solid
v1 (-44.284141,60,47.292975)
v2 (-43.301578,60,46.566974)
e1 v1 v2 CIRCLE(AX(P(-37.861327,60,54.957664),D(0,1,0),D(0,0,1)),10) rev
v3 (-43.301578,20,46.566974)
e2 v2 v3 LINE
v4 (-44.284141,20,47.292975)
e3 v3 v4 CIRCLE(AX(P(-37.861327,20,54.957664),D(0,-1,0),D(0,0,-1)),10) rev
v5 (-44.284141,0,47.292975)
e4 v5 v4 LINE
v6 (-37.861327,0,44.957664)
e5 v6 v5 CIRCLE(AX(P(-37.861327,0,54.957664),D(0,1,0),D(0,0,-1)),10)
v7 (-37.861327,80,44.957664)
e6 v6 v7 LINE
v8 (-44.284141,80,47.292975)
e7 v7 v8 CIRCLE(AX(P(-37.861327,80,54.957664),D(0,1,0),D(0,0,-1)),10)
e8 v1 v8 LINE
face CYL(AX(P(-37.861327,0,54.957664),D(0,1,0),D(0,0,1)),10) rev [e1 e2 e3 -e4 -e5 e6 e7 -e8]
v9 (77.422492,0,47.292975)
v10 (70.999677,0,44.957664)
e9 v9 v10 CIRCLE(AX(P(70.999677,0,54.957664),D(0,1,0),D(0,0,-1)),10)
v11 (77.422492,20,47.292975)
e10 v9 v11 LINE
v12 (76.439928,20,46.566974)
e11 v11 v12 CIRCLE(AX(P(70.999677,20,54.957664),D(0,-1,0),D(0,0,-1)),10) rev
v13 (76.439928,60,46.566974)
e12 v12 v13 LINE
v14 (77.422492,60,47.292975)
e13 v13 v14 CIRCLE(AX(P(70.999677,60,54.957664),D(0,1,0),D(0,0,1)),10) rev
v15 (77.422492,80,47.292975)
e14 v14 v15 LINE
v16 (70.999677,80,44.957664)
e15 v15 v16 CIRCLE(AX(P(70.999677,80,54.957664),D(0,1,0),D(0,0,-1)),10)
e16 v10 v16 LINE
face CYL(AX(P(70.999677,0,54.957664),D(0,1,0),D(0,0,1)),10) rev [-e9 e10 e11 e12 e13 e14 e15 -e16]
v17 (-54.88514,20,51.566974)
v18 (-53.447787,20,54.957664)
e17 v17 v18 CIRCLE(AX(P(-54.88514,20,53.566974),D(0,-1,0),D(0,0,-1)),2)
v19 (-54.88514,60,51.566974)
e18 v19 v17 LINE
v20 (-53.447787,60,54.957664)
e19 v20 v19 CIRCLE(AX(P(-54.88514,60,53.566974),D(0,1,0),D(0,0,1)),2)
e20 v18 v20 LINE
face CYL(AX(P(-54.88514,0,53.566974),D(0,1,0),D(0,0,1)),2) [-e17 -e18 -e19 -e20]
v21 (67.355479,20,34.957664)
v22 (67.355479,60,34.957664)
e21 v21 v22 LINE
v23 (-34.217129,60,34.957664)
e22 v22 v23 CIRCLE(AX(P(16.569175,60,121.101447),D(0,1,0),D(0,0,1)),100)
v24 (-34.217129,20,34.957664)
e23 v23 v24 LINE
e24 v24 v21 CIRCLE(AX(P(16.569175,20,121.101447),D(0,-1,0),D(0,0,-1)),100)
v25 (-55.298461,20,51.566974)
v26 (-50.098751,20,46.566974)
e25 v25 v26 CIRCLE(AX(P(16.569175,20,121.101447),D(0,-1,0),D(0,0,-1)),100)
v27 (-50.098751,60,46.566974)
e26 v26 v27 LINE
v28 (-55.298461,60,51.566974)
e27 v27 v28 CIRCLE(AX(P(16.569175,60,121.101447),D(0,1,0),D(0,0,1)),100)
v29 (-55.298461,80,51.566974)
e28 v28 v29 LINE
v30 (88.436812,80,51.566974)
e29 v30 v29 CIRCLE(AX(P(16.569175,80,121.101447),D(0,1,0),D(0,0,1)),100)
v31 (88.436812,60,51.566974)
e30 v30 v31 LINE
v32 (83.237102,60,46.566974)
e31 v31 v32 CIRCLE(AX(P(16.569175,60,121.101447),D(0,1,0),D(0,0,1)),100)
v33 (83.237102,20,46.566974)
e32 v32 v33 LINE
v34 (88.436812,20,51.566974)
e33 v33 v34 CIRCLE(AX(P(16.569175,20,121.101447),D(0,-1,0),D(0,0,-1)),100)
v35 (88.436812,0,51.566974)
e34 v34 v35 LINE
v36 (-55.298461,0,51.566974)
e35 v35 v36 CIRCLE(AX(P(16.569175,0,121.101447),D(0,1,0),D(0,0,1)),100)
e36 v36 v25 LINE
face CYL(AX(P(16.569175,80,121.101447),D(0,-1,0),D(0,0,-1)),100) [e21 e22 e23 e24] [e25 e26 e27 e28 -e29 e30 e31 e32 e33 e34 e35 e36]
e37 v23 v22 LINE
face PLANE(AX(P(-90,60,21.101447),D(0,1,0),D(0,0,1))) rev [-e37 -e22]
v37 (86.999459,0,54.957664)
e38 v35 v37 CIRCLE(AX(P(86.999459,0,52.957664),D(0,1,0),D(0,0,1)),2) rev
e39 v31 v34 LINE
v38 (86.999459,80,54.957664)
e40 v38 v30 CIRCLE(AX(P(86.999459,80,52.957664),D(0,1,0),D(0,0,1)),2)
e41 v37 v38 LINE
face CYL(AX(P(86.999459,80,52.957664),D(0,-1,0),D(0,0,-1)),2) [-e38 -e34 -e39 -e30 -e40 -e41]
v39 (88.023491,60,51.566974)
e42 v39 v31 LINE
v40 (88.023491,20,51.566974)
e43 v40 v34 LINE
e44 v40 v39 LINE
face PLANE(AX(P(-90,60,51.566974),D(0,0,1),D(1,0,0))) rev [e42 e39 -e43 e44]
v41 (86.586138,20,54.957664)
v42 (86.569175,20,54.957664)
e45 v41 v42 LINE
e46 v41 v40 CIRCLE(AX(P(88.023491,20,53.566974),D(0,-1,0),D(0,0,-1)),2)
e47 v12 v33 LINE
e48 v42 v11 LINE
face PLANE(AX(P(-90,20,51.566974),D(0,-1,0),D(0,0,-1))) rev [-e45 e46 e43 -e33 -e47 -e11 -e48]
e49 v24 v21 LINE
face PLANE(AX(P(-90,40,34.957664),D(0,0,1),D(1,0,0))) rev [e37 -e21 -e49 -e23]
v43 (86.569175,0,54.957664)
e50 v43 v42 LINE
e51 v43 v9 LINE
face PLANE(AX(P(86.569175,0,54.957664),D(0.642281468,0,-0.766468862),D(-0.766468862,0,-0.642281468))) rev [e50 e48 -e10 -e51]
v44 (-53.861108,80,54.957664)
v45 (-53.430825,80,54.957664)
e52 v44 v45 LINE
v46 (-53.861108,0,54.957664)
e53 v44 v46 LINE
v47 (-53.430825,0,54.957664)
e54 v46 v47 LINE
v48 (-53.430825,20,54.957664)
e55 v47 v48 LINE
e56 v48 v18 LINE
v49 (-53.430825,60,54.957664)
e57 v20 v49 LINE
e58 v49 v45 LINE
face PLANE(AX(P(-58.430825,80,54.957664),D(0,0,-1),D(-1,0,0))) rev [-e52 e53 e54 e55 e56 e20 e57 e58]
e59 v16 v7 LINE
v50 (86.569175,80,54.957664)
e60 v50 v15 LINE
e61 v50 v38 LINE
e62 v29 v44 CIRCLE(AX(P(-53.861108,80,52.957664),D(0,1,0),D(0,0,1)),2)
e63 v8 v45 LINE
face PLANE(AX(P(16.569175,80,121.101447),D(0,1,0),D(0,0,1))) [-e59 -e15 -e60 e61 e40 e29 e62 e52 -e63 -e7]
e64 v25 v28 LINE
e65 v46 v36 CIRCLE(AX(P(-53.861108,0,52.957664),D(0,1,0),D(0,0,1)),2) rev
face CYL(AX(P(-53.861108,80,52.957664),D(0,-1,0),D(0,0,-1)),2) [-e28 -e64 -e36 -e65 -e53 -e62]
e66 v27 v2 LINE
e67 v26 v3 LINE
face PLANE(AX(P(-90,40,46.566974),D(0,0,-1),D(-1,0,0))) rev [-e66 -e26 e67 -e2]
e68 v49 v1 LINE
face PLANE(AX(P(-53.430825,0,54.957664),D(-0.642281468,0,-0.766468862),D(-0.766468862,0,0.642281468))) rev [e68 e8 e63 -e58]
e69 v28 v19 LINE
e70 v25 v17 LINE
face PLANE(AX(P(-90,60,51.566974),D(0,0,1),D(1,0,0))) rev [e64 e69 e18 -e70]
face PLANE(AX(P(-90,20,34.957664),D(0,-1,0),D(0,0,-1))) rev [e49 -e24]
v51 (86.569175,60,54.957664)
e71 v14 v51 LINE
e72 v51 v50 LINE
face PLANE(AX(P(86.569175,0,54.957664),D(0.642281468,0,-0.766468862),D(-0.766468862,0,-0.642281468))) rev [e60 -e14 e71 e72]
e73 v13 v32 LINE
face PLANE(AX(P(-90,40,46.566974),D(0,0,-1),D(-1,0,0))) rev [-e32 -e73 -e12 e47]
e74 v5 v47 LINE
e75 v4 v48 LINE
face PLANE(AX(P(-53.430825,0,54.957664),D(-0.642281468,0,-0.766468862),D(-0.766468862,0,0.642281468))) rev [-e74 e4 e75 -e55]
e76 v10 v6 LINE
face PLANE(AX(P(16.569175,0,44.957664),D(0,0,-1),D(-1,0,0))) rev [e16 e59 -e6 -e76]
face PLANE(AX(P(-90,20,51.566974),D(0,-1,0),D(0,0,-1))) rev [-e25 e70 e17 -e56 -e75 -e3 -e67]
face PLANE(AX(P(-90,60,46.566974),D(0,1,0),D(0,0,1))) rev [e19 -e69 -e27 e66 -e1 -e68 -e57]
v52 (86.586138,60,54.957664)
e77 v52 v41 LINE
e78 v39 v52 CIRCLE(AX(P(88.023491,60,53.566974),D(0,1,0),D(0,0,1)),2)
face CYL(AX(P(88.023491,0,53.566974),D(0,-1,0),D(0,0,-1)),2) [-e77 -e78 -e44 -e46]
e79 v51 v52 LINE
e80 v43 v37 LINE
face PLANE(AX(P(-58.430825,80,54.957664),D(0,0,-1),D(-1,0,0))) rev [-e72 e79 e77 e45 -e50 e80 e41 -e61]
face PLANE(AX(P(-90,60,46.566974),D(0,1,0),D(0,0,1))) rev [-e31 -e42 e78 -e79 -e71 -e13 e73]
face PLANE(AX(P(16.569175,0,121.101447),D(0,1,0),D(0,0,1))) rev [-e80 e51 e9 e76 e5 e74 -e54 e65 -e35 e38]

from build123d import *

# Parameters (mm, degrees)
EXTRUDE_4_DEPTH     = 80
CUT_EXTRUDE_1_DEPTH = 80
FILLET_3_R          = 2
FILLET_4_R          = 2
CUT_EXTRUDE_2_DEPTH = 90
CUT_EXTRUDE_3_DEPTH = 90
FILLET_5_R          = 2
FILLET_6_R          = 2


with BuildPart() as part:
    # 草图1 → 凸台-拉伸4 (new body)
    with BuildSketch(Plane(origin=(0, 0, 0), x_dir=(1, 0, 0), z_dir=(0, 1, 0))):
        with BuildLine():
            Line((-58.430824656, -54.95766375), (91.569175344, -54.95766375))
            ThreePointArc((91.569175344, -54.95766375), (16.569175344, -21.101446527), (-58.430824656, -54.95766375))
        make_face()
    extrude(amount=EXTRUDE_4_DEPTH)

    # 草图6 → 切除-拉伸1 (cut)
    with BuildSketch(Plane(origin=(0, 80, 0), x_dir=(1, 0, 0), z_dir=(0, 1, 0))):
        with BuildLine():
            Line((16.569175344, -54.95766375), (-53.430824656, -54.95766375))
            Line((-53.430824656, -54.95766375), (-44.284141383, -47.292975133))
            ThreePointArc((-44.284141383, -47.292975133), (-41.278424436, -45.559608468), (-37.861326704, -44.95766375))
            Line((-37.861326704, -44.95766375), (16.569175344, -44.95766375))
            Line((16.569175344, -44.95766375), (70.999677391, -44.95766375))
            ThreePointArc((70.999677391, -44.95766375), (74.416775124, -45.559608468), (77.422492071, -47.292975133))
            Line((77.422492071, -47.292975133), (86.569175344, -54.95766375))
            Line((86.569175344, -54.95766375), (16.569175344, -54.95766375))
        make_face()
    extrude(amount=-CUT_EXTRUDE_1_DEPTH, mode=Mode.SUBTRACT)

    # 圆角3
    fillet_3_edges = [part.edges().sort_by_distance(p)[0] for p in [
        (-58.430824656, 40, 54.95766375),
    ]]
    fillet(fillet_3_edges, radius=FILLET_3_R)

    # 圆角4
    fillet_4_edges = [part.edges().sort_by_distance(p)[0] for p in [
        (91.569175344, 40, 54.95766375),
    ]]
    fillet(fillet_4_edges, radius=FILLET_4_R)

    # 草图7 → 切除-拉伸2 (cut, symmetric)
    with BuildSketch(Plane(origin=(0, 0, 0), x_dir=(0, 0, -1), z_dir=(1, 0, 0))):
        Polygon((-34.95766375, 20), (-21.101446527, 20), (-21.101446527, 60), (-34.95766375, 60), (-34.95766375, 40), align=None)
    extrude(amount=CUT_EXTRUDE_2_DEPTH, both=True, mode=Mode.SUBTRACT)

    # 草图8 → 切除-拉伸3 (cut, symmetric)
    with BuildSketch(Plane(origin=(0, 0, 0), x_dir=(0, 0, -1), z_dir=(1, 0, 0))):
        Polygon((-46.566974306, 40), (-46.566974306, 20), (-51.566974306, 20), (-51.566974306, 40), (-51.566974306, 60), (-46.566974306, 60), align=None)
    extrude(amount=CUT_EXTRUDE_3_DEPTH, both=True, mode=Mode.SUBTRACT)

    # 圆角5
    # the kernel refuses this fillet: 2 mm, written as the material it takes off along each edge
    with BuildSketch(Plane(origin=(-49.384533414, 20, 51.566974306), x_dir=(-0.7664688616948695, 0, 0.6422814679345583), z_dir=(0, 1, 0))) as fillet_5_piece_1:
        with BuildLine():
            CenterArc((FILLET_5_R * 2.75030333255, -FILLET_5_R), FILLET_5_R, 90, 140.037846047)
            Line((FILLET_5_R * 2.10802186461, -FILLET_5_R * 1.76646886169), (0, 0))
            Line((0, 0), (FILLET_5_R * 2.75030333255, 0))
        make_face()
    extrude(amount=40, mode=Mode.SUBTRACT)

    # 圆角6
    # the kernel refuses this fillet: 2 mm, written as the material it takes off along each edge
    with BuildSketch(Plane(origin=(82.522884101, 60, 51.566974306), x_dir=(1, 0, 0), z_dir=(0, -1, 0))) as fillet_6_piece_1:
        with BuildLine():
            CenterArc((FILLET_6_R * 2.75030333255, FILLET_6_R), FILLET_6_R, 129.962153953, 140.037846047)
            Line((FILLET_6_R * 2.10802186461, FILLET_6_R * 1.76646886169), (0, 0))
            Line((0, 0), (FILLET_6_R * 2.75030333255, 0))
        make_face()
    extrude(amount=40, mode=Mode.SUBTRACT)


solid = part.part
